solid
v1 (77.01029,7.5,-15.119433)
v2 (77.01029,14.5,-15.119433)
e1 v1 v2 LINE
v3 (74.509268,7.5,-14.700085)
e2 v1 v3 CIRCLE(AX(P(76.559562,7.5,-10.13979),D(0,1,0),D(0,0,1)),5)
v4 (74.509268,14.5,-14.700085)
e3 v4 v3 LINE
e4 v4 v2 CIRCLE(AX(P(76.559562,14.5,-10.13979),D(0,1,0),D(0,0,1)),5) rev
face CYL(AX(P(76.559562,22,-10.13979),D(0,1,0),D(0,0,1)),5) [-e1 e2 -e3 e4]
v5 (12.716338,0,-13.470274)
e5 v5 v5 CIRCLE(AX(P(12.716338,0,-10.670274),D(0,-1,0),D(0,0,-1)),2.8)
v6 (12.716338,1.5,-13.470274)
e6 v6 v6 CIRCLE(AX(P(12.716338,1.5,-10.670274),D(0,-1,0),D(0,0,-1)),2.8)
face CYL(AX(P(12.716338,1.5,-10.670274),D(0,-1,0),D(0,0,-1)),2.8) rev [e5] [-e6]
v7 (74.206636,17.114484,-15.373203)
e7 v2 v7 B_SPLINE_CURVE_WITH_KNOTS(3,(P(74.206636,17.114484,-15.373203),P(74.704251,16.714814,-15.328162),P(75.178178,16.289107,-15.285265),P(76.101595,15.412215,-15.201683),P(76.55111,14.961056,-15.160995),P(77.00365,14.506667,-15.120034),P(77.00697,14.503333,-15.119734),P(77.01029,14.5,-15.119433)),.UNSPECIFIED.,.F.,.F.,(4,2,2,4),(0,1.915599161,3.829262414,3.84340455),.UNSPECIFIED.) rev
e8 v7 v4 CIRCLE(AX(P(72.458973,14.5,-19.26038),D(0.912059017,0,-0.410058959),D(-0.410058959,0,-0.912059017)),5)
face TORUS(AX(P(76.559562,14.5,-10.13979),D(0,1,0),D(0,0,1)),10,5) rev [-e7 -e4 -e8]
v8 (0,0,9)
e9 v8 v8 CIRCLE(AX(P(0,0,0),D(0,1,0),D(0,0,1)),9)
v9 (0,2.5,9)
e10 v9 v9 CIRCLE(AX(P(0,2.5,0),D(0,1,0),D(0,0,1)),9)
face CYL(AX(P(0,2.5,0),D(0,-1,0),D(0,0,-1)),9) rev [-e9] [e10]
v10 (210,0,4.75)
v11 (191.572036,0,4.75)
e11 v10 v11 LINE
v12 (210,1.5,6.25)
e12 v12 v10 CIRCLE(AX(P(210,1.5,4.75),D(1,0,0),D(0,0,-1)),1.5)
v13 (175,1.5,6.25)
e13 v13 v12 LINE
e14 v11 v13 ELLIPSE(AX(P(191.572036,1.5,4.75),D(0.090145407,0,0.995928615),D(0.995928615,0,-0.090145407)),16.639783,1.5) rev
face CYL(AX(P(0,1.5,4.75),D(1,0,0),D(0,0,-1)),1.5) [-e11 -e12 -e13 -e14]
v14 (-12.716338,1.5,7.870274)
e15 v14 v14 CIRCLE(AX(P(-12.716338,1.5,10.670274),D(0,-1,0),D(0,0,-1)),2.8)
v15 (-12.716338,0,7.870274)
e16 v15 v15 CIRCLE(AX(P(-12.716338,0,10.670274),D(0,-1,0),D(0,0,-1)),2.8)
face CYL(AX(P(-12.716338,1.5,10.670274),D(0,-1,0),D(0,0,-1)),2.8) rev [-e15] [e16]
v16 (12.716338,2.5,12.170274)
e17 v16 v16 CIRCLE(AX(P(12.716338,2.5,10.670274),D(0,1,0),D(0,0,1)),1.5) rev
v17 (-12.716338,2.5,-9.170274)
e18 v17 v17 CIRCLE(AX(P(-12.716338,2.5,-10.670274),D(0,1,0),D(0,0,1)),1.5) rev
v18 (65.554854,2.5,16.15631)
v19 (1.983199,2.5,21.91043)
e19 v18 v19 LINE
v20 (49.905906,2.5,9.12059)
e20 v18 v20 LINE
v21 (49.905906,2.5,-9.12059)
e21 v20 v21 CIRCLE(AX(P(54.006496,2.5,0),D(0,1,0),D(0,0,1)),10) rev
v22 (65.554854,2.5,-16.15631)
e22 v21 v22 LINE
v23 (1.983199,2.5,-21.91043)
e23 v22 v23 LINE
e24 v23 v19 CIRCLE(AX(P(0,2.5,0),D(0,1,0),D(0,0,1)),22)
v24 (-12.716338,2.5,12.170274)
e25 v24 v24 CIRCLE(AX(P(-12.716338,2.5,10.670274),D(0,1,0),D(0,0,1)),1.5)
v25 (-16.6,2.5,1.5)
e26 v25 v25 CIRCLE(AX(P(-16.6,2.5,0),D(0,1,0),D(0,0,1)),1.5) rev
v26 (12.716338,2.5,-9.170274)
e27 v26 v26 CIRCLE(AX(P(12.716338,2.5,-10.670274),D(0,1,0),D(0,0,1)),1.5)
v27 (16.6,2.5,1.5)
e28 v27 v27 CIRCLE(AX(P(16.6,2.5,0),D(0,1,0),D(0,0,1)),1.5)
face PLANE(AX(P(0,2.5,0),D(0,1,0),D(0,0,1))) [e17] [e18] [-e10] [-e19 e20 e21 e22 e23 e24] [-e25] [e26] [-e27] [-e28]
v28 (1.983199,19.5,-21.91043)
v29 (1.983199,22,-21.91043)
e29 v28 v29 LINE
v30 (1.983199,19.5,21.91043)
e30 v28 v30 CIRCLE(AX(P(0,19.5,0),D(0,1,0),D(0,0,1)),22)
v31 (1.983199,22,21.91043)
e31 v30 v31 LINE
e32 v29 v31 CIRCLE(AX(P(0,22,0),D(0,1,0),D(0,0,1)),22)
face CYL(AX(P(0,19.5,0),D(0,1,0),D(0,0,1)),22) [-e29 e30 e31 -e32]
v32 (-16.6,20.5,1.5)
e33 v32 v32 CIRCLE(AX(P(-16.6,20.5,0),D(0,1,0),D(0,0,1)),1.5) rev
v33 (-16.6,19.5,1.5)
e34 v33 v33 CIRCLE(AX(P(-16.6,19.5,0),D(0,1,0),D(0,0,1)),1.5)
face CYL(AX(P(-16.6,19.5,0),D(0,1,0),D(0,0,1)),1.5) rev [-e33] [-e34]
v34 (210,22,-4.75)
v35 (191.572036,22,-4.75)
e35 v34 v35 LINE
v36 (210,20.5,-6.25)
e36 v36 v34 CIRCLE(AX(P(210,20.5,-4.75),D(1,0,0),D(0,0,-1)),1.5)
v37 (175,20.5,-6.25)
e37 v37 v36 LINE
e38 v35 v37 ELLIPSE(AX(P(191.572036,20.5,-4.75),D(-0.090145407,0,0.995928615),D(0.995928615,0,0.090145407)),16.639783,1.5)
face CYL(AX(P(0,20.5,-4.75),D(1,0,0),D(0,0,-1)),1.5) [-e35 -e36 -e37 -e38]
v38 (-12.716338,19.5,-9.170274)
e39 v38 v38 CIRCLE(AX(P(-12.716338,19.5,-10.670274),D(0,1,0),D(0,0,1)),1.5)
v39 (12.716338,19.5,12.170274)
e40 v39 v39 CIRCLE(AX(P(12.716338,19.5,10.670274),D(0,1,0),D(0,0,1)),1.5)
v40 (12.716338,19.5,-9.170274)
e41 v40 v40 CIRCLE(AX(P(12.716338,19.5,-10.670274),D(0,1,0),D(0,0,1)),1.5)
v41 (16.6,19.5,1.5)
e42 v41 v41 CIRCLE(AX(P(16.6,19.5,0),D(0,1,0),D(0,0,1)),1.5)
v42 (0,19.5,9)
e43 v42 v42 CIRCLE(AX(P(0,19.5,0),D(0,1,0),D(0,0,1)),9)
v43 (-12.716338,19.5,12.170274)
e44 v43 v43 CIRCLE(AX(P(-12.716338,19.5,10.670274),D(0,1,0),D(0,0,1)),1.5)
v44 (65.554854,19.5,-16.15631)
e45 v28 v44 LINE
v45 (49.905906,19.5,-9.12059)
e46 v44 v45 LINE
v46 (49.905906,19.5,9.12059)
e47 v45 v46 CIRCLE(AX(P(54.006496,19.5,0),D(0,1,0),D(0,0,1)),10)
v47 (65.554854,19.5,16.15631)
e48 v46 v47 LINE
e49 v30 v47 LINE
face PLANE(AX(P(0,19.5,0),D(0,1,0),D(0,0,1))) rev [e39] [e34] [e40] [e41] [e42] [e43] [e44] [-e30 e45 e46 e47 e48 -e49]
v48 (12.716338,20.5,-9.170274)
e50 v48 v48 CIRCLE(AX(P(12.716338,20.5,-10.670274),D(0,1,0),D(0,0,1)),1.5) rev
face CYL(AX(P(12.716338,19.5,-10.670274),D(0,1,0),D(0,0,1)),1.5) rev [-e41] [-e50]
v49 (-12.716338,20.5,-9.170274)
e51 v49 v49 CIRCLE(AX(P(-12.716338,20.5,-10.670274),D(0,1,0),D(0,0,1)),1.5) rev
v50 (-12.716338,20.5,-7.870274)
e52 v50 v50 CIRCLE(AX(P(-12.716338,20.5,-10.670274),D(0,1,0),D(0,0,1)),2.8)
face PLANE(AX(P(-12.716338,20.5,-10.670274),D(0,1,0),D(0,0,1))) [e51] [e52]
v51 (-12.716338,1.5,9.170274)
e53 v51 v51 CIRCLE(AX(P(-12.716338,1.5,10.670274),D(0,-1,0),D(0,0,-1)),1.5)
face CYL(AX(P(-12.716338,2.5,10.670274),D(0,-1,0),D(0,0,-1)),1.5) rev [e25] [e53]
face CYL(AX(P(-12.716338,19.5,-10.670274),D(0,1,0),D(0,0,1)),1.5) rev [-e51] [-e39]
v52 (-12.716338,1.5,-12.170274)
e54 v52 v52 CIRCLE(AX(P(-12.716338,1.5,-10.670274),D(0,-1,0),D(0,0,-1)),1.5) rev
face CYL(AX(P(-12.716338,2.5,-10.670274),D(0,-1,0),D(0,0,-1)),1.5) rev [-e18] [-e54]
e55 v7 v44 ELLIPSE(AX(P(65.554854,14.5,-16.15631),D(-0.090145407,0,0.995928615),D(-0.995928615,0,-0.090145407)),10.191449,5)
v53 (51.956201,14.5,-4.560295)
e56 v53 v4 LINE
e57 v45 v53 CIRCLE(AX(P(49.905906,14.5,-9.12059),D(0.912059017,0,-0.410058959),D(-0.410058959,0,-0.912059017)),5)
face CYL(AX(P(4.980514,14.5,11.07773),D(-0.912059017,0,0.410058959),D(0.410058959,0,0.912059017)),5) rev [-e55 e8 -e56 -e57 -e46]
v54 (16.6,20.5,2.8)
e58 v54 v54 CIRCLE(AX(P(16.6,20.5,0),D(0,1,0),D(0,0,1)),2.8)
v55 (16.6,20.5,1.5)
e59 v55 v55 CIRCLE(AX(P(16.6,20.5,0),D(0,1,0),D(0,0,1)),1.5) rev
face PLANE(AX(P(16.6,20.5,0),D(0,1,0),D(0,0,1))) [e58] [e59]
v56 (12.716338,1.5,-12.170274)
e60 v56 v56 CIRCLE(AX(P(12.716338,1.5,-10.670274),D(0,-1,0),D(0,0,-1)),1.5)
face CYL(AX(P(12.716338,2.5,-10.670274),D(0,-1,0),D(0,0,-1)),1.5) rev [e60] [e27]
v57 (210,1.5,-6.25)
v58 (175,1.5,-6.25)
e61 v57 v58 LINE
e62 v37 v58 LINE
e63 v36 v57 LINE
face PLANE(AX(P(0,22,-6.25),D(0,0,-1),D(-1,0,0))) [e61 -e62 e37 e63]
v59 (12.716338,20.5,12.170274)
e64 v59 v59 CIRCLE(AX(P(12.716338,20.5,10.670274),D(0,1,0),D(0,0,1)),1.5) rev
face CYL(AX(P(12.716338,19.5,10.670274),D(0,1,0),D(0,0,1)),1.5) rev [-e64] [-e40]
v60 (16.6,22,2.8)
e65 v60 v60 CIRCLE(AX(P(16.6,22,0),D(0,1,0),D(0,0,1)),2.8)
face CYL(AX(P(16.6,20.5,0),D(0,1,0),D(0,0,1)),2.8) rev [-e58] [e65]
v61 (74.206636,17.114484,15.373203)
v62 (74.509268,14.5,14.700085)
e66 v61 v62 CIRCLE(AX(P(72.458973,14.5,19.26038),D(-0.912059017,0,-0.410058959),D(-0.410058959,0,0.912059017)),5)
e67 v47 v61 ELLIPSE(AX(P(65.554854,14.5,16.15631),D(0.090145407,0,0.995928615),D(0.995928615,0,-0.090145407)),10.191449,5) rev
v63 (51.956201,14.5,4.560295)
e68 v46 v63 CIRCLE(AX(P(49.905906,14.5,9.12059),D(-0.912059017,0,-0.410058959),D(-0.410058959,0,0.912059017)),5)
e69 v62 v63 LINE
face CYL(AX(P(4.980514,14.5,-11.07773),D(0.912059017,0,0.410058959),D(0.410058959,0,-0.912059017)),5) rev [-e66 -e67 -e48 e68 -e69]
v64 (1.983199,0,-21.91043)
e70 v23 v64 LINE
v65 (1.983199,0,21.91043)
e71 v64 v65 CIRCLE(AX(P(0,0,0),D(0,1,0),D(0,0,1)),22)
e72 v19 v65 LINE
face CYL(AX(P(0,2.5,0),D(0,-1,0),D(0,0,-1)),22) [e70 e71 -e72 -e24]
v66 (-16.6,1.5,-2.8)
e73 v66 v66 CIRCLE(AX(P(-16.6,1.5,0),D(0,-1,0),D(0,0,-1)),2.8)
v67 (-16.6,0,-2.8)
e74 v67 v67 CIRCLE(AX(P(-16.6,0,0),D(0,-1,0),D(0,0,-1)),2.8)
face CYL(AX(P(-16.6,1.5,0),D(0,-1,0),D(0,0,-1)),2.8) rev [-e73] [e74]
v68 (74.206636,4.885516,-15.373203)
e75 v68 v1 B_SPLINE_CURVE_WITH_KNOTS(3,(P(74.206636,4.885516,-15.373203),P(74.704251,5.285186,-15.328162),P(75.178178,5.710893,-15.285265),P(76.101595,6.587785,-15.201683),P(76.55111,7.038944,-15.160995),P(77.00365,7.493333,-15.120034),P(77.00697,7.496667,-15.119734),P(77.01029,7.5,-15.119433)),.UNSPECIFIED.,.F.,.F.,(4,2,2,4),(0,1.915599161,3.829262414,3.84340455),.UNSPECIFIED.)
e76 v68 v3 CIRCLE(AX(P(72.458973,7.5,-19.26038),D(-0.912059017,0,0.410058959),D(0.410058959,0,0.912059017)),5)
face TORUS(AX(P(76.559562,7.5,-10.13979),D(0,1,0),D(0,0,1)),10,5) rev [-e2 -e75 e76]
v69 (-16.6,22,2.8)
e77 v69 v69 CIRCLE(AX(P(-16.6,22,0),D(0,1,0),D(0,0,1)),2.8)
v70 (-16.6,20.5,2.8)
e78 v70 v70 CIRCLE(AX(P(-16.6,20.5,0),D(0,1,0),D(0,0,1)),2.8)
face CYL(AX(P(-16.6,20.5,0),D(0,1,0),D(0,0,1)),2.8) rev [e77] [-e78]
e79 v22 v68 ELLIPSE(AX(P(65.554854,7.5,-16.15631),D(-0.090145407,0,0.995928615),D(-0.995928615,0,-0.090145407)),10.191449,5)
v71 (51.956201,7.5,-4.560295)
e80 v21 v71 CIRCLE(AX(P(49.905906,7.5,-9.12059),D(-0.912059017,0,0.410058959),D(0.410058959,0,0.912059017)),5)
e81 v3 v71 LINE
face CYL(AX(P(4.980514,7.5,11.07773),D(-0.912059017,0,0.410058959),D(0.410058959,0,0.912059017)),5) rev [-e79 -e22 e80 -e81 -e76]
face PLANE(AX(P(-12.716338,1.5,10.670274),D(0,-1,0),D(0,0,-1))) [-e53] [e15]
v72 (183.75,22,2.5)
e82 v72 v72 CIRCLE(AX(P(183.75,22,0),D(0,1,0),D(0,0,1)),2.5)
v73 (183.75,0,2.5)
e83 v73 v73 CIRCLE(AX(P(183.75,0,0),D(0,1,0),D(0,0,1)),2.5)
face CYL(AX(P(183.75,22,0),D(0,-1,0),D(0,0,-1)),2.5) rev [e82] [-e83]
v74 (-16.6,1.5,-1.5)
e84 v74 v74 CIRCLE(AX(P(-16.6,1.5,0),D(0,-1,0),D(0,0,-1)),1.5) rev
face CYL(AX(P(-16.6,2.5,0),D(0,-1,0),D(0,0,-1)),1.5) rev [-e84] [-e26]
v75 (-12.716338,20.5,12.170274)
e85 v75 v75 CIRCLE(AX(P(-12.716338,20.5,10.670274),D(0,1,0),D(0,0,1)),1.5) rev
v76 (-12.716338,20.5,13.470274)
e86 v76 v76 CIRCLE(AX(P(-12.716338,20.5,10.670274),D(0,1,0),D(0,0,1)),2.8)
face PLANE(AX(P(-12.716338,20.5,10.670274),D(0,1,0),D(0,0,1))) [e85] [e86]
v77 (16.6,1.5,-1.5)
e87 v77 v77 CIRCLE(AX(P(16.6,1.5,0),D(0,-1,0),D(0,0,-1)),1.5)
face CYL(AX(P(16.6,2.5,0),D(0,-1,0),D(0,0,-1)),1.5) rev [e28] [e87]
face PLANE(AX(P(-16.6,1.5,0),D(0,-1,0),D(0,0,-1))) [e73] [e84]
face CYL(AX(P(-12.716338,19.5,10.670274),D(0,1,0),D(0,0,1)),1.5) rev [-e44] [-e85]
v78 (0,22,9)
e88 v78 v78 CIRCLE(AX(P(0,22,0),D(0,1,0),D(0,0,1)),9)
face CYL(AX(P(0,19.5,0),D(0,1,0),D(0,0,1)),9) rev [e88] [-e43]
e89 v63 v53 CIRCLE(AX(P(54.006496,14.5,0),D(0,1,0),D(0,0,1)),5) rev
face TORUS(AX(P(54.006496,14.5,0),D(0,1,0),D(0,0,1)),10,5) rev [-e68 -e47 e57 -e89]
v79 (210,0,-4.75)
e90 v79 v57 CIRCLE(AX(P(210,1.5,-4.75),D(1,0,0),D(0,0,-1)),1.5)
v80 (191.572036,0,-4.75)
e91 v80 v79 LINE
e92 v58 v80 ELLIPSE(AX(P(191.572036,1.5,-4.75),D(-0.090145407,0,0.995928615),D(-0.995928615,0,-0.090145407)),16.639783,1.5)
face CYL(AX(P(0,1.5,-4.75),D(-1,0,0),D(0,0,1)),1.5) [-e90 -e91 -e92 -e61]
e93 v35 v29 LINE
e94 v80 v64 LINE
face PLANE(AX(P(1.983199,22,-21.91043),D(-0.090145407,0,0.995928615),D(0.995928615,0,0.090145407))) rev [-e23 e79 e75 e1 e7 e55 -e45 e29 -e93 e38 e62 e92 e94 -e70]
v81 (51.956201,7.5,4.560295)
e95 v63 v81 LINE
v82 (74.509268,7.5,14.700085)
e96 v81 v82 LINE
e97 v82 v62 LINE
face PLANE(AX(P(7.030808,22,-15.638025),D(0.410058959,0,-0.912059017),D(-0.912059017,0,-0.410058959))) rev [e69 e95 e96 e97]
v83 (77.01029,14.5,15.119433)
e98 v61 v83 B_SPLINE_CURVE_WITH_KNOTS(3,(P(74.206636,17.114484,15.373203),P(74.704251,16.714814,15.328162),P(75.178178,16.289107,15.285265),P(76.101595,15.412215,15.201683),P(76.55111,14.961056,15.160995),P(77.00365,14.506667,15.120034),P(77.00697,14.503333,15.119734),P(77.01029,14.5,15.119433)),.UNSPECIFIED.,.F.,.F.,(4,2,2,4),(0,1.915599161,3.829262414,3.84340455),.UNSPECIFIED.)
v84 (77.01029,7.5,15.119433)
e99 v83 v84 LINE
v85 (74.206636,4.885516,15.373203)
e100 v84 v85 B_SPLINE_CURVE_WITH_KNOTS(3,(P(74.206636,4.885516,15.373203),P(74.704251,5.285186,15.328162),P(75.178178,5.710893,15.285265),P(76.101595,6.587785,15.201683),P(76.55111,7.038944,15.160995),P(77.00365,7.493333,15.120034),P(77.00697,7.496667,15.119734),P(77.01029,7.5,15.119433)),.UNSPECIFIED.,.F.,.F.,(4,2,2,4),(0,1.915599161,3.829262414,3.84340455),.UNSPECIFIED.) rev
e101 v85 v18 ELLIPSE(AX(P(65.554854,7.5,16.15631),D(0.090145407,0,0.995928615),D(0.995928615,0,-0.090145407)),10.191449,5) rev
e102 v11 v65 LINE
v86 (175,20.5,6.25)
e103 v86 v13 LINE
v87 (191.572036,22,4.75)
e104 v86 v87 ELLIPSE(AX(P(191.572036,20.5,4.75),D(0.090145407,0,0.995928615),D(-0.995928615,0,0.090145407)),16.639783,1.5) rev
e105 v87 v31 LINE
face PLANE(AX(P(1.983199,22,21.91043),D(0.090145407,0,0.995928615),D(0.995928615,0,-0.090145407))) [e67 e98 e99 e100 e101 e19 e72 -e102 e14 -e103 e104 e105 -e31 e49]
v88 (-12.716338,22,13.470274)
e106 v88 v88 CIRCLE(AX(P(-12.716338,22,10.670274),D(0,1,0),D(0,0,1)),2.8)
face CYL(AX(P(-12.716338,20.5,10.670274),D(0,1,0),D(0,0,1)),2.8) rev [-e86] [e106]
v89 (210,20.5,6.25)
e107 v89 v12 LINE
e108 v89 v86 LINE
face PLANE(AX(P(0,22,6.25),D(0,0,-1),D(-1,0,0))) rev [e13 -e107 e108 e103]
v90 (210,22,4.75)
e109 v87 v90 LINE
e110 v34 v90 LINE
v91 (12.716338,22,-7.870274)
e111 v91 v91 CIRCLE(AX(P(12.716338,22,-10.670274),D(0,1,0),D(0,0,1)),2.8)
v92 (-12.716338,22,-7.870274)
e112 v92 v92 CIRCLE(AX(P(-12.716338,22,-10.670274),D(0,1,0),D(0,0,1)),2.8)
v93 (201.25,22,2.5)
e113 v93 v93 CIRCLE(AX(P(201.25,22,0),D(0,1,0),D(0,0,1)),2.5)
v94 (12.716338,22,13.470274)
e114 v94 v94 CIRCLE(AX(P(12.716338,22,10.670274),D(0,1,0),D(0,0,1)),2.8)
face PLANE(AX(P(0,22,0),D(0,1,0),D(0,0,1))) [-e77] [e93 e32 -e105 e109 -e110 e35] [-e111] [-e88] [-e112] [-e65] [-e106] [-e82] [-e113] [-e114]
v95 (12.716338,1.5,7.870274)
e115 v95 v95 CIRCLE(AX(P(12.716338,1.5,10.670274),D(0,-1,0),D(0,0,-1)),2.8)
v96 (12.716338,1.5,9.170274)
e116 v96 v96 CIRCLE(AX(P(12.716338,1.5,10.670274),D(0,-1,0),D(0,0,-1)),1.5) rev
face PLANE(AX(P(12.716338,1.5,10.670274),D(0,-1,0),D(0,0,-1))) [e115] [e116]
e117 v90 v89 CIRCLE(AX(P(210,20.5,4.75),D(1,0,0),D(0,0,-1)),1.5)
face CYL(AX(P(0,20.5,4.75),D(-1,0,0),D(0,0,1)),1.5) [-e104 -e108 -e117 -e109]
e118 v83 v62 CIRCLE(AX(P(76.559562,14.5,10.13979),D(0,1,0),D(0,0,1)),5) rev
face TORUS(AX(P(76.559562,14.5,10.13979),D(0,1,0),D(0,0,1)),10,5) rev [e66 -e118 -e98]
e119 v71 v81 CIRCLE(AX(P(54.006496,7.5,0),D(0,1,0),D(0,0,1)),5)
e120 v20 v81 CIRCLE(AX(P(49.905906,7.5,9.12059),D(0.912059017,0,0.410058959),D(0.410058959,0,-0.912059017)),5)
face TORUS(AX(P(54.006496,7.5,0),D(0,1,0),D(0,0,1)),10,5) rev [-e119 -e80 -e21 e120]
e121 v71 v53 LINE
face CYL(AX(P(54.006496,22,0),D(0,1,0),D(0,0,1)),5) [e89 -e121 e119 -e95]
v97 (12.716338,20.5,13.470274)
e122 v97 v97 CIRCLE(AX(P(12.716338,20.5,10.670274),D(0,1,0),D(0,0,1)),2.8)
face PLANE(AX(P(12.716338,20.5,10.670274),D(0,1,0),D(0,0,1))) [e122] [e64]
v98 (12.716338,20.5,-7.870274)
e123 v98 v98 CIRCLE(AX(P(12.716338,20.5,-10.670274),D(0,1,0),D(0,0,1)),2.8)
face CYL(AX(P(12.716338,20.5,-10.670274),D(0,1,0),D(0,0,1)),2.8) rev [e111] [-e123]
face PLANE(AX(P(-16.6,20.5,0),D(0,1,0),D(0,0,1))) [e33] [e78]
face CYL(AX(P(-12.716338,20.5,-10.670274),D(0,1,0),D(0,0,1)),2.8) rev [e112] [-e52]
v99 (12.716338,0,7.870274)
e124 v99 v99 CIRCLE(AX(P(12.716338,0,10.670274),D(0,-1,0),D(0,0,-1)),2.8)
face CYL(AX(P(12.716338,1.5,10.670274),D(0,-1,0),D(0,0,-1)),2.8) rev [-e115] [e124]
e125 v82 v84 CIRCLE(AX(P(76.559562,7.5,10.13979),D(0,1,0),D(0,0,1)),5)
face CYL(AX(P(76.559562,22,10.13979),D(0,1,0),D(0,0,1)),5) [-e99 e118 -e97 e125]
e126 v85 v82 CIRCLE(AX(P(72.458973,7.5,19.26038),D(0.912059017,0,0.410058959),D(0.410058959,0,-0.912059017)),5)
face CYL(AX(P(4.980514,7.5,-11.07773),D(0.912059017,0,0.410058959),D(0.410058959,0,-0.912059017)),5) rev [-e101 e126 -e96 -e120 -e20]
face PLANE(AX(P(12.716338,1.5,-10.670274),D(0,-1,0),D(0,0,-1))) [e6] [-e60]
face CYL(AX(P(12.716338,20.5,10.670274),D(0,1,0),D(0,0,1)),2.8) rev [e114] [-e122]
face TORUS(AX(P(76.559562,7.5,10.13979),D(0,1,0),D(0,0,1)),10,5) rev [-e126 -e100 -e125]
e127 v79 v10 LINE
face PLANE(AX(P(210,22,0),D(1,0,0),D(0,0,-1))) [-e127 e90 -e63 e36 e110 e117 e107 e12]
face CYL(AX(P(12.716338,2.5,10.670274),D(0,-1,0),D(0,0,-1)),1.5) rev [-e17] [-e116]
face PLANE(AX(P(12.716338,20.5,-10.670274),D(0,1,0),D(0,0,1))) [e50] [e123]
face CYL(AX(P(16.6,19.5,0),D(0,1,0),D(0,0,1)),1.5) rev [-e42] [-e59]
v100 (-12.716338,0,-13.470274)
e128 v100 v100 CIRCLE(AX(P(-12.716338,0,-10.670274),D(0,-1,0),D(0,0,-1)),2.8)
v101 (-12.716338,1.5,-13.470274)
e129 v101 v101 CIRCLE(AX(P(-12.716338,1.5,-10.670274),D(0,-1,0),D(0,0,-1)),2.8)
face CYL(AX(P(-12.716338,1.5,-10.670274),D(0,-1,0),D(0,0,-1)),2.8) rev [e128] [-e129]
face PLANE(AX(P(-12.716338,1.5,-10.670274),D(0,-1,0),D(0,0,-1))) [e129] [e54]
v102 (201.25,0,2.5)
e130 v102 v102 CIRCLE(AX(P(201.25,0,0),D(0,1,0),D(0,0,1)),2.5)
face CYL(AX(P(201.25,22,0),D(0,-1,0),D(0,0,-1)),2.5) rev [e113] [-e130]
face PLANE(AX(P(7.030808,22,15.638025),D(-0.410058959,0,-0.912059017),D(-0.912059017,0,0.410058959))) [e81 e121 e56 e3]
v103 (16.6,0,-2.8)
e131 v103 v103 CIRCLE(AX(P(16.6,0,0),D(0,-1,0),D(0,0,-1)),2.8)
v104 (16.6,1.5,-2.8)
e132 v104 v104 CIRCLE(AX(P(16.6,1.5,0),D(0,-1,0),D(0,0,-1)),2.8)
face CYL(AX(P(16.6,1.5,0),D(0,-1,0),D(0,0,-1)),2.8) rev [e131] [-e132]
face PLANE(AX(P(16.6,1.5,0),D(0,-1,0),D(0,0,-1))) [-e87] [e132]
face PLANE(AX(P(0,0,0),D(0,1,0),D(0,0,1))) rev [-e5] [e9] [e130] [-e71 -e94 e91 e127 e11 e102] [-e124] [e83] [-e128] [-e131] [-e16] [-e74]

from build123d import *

# Parameters (mm, degrees)
SKETCH1_R           = 2.499999999999995
SKETCH1_R_2         = 2.4999999999999956
BOSS_EXTRUDE1_DEPTH = 22
SKETCH1_3_R         = 22
SKETCH1_3_R_2       = 1.499999999999997
SKETCH1_3_R_3       = 1.4999999999999987
SKETCH1_3_R_4       = 9
BOSS_EXTRUDE2_DEPTH = 2.5
BOSS_EXTRUDE3_START = 19.5
SKETCH1_4_R         = 22
SKETCH1_4_R_2       = 1.499999999999997
SKETCH1_4_R_3       = 1.4999999999999987
SKETCH1_4_R_4       = 9
BOSS_EXTRUDE3_DEPTH = 2.5
FILLET1_R           = 5
FILLET2_R           = 5
SKETCH2_R           = 2.8000000000000003
SKETCH2_R_2         = 2.799999999999998
SKETCH2_R_3         = 2.800000000000374
SKETCH2_R_4         = 2.800000000000002
SKETCH2_R_5         = 2.8000000000000007
CUT_EXTRUDE3_DEPTH  = 1.5
CUT_EXTRUDE4_START  = -20.5
SKETCH2_3_R         = 2.8000000000000003
SKETCH2_3_R_2       = 2.799999999999998
SKETCH2_3_R_3       = 2.800000000000374
SKETCH2_3_R_4       = 2.800000000000002
SKETCH2_3_R_5       = 2.8000000000000007
CUT_EXTRUDE4_DEPTH  = 1.5
FILLET3_R           = 1.5


with BuildPart() as part:
    # Sketch1 → Boss-Extrude1 (new body)
    with BuildSketch(Plane(origin=(0, 0, 0), x_dir=(1, 0, 0), z_dir=(0, 1, 0))):
        Polygon((210, 6.25), (175, 6.25), (75.7048097561628, 15.237597270585965), (41.813127412360984, 0), (75.70480975616282, -15.237597270585962), (175, -6.25), (210, -6.25), align=None)
        with Locations(Location((183.75, 8.7e-16, 0), (0, 0, 270))):
            Circle(SKETCH1_R, mode=Mode.SUBTRACT)
        with Locations(Location((201.24999999999997, 8.7e-16, 0), (0, 0, 270))):
            Circle(SKETCH1_R_2, mode=Mode.SUBTRACT)
    extrude(amount=BOSS_EXTRUDE1_DEPTH)

    # Sketch1<3> → Boss-Extrude2 (add)
    # profile 1 of 3: a face of its own
    with BuildSketch(Plane(origin=(0, 0, 0), x_dir=(1, 0, 0), z_dir=(0, 1, 0))):
        Circle(SKETCH1_3_R)
        with Locations(Location((-16.599999999999994, -4.07e-15, 0), (0, 0, 270))):
            Circle(SKETCH1_3_R_2, mode=Mode.SUBTRACT)
        with Locations(Location((-12.716337755775092, -10.670274320796484, 0), (0, 0, 270))):
            Circle(SKETCH1_3_R_3, mode=Mode.SUBTRACT)
        with Locations(Location((12.716337755775099, -10.67027432079648, 0), (0, 0, 270))):
            Circle(SKETCH1_3_R_3, mode=Mode.SUBTRACT)
        with Locations(Location((12.716337755775099, 10.67027432079648, 0), (0, 0, 270))):
            Circle(SKETCH1_3_R_3, mode=Mode.SUBTRACT)
        with Locations(Location((16.6, 0, 0), (0, 0, 270))):
            Circle(SKETCH1_3_R_2, mode=Mode.SUBTRACT)
        with Locations(Location((-12.716337755775095, 10.670274320796477, 0), (0, 0, 270))):
            Circle(SKETCH1_3_R_3, mode=Mode.SUBTRACT)
        with Locations(Location((0, 0, 0), (0, 0, 270))):
            Circle(SKETCH1_3_R_4, mode=Mode.SUBTRACT)
    # profile 2 of 3: a face of its own
    with BuildSketch(Plane(origin=(0, 0, 0), x_dir=(1, 0, 0), z_dir=(0, 1, 0))):
        with BuildLine():
            ThreePointArc((26, 0), (23.30625405943406, 11.524691827424864), (15.783190637145122, 20.661338129742095))
            Line((15.783190637145111, 20.661338129742038), (1.9831989455582573, 21.910429524368908))
            ThreePointArc((1.9831989455582602, 21.910429524368904), (16.242388629790288, 14.838625664085578), (22, 0))
            ThreePointArc((22, -5.39e-15), (16.24238862979029, -14.838625664085573), (1.9831989455582546, -21.910429524368904))
            Line((1.9831989455582573, -21.910429524368908), (15.783190637145054, -20.66133812974204))
            ThreePointArc((15.78319063714509, -20.66133812974212), (23.30625405943405, -11.524691827424883), (26, -6.37e-15))
        make_face()
    # profile 3 of 3: a face of its own
    with BuildSketch(Plane(origin=(0, 0, 0), x_dir=(1, 0, 0), z_dir=(0, 1, 0))):
        with BuildLine():
            Line((41.813127412360984, 0), (75.7048097561628, 15.237597270585965))
            Line((75.7048097561628, 15.237597270585965), (15.783190637145111, 20.661338129742038))
            ThreePointArc((15.783190637145122, 20.661338129742095), (23.30625405943406, 11.524691827424864), (26, 0))
            ThreePointArc((26, -6.37e-15), (23.30625405943405, -11.524691827424883), (15.78319063714509, -20.66133812974212))
            Line((15.783190637145054, -20.66133812974204), (75.70480975616282, -15.237597270585963))
            Line((75.70480975616282, -15.237597270585962), (41.813127412360984, 0))
        make_face()
    extrude(amount=BOSS_EXTRUDE2_DEPTH)

    # Sketch1<4> → Boss-Extrude3 (add)
    # profile 1 of 3: a face of its own
    with BuildSketch(Plane(origin=(0, 0, 0), x_dir=(1, 0, 0), z_dir=(0, 1, 0)).offset(BOSS_EXTRUDE3_START)):
        Circle(SKETCH1_4_R)
        with Locations(Location((-16.599999999999994, -4.07e-15, 0), (0, 0, 270))):
            Circle(SKETCH1_4_R_2, mode=Mode.SUBTRACT)
        with Locations(Location((-12.716337755775092, -10.670274320796484, 0), (0, 0, 270))):
            Circle(SKETCH1_4_R_3, mode=Mode.SUBTRACT)
        with Locations(Location((12.716337755775099, -10.67027432079648, 0), (0, 0, 270))):
            Circle(SKETCH1_4_R_3, mode=Mode.SUBTRACT)
        with Locations(Location((12.716337755775099, 10.67027432079648, 0), (0, 0, 270))):
            Circle(SKETCH1_4_R_3, mode=Mode.SUBTRACT)
        with Locations(Location((16.6, 0, 0), (0, 0, 270))):
            Circle(SKETCH1_4_R_2, mode=Mode.SUBTRACT)
        with Locations(Location((-12.716337755775095, 10.670274320796477, 0), (0, 0, 270))):
            Circle(SKETCH1_4_R_3, mode=Mode.SUBTRACT)
        with Locations(Location((0, 0, 0), (0, 0, 270))):
            Circle(SKETCH1_4_R_4, mode=Mode.SUBTRACT)
    # profile 2 of 3: a face of its own
    with BuildSketch(Plane(origin=(0, 0, 0), x_dir=(1, 0, 0), z_dir=(0, 1, 0)).offset(BOSS_EXTRUDE3_START)):
        with BuildLine():
            ThreePointArc((26, 0), (23.30625405943406, 11.524691827424864), (15.783190637145122, 20.661338129742095))
            Line((15.783190637145111, 20.661338129742038), (1.9831989455582573, 21.910429524368908))
            ThreePointArc((1.9831989455582602, 21.910429524368904), (16.242388629790288, 14.838625664085578), (22, 0))
            ThreePointArc((22, -5.39e-15), (16.24238862979029, -14.838625664085573), (1.9831989455582546, -21.910429524368904))
            Line((1.9831989455582573, -21.910429524368908), (15.783190637145054, -20.66133812974204))
            ThreePointArc((15.78319063714509, -20.66133812974212), (23.30625405943405, -11.524691827424883), (26, -6.37e-15))
        make_face()
    # profile 3 of 3: a face of its own
    with BuildSketch(Plane(origin=(0, 0, 0), x_dir=(1, 0, 0), z_dir=(0, 1, 0)).offset(BOSS_EXTRUDE3_START)):
        with BuildLine():
            Line((41.813127412360984, 0), (75.7048097561628, 15.237597270585965))
            Line((75.7048097561628, 15.237597270585965), (15.783190637145111, 20.661338129742038))
            ThreePointArc((15.783190637145122, 20.661338129742095), (23.30625405943406, 11.524691827424864), (26, 0))
            ThreePointArc((26, -6.37e-15), (23.30625405943405, -11.524691827424883), (15.78319063714509, -20.66133812974212))
            Line((15.783190637145054, -20.66133812974204), (75.70480975616282, -15.237597270585963))
            Line((75.70480975616282, -15.237597270585962), (41.813127412360984, 0))
        make_face()
    extrude(amount=BOSS_EXTRUDE3_DEPTH)

    # Fillet1
    fillet1_edges = [part.edges().sort_by_distance(p)[0] for p in [
        (75.7048097561628, 11, -15.237597270585965),
        (75.70480975616282, 11, 15.237597270585962),
        (41.813127412360984, 11, 0),
    ]]
    fillet(fillet1_edges, radius=FILLET1_R)

    # Fillet2
    # the kernel refuses this fillet: 5 mm, written as the material it adds along each edge
    with BuildSketch(Plane(origin=(74.50926767179394, 19.5, 14.700085186740369), x_dir=(-0.4100589591103126, 0, 0.9120590167600816), z_dir=(-0.9120590167600817, 0, -0.41005895911031254))) as fillet2_piece_1_section:
        with BuildLine():
            CenterArc((FILLET2_R, -FILLET2_R), FILLET2_R, 90, 90)
            Line((-1.62e-15, -FILLET2_R), (0, 0))
            Line((0, 0), (FILLET2_R, 0))
        make_face()
    fillet2_piece_1 = extrude(amount=24.72763947150388, mode=Mode.PRIVATE)
    fillet2_piece_1 = split(fillet2_piece_1, bisect_by=Plane(origin=(62.92164276949458, 18.35420314681747, 16.394651871485475), z_dir=(-0.09014540661628426, 0, -0.9959286147440413)), keep=Keep.TOP, mode=Mode.PRIVATE)
    add(fillet2_piece_1)
    with BuildSketch(Plane(origin=(74.50926767179394, 2.5, 14.700085186740369), x_dir=(-0.4100589591103126, 0, 0.9120590167600816), z_dir=(-0.9120590167600817, 0, -0.41005895911031254))) as fillet2_piece_2_section:
        with BuildLine():
            CenterArc((FILLET2_R, FILLET2_R), FILLET2_R, 180, 90)
            Line((-1.62e-15, FILLET2_R), (0, 0))
            Line((0, 0), (FILLET2_R, 0))
        make_face()
    fillet2_piece_2 = extrude(amount=24.72763947150388, mode=Mode.PRIVATE)
    fillet2_piece_2 = split(fillet2_piece_2, bisect_by=Plane(origin=(62.921642769494596, 3.6457968531825293, 16.394651871485472), z_dir=(-0.09014540661628426, 0, -0.9959286147440413)), keep=Keep.TOP, mode=Mode.PRIVATE)
    add(fillet2_piece_2)
    with BuildSketch(Plane(origin=(51.95620112861632, 19.5, -4.560295083800408), x_dir=(-0.41005895911031287, 0, -0.9120590167600817), z_dir=(0.9120590167600817, 0, -0.4100589591103128))) as fillet2_piece_3_section:
        with BuildLine():
            CenterArc((FILLET2_R, -FILLET2_R), FILLET2_R, 90, 90)
            Line((3.3e-16, -FILLET2_R), (0, 0))
            Line((0, 0), (FILLET2_R, 0))
        make_face()
    fillet2_piece_3 = extrude(amount=24.727639471503775, mode=Mode.PRIVATE)
    fillet2_piece_3 = split(fillet2_piece_3, bisect_by=Plane(origin=(62.921642769494525, 18.354203146817465, -16.39465187148548), z_dir=(-0.09014540661628426, 0, 0.9959286147440413)), keep=Keep.TOP, mode=Mode.PRIVATE)
    add(fillet2_piece_3)
    with BuildSketch(Plane(origin=(51.95620112861632, 2.5, -4.560295083800408), x_dir=(-0.41005895911031287, 0, -0.9120590167600817), z_dir=(0.9120590167600817, 0, -0.4100589591103128))) as fillet2_piece_4_section:
        with BuildLine():
            CenterArc((FILLET2_R, FILLET2_R), FILLET2_R, 180, 90)
            Line((3.3e-16, FILLET2_R), (0, 0))
            Line((0, 0), (FILLET2_R, 0))
        make_face()
    fillet2_piece_4 = extrude(amount=24.727639471503775, mode=Mode.PRIVATE)
    fillet2_piece_4 = split(fillet2_piece_4, bisect_by=Plane(origin=(62.921642769494554, 3.6457968531825298, -16.39465187148548), z_dir=(-0.09014540661628426, 0, 0.9959286147440413)), keep=Keep.TOP, mode=Mode.PRIVATE)
    add(fillet2_piece_4)
    with BuildSketch(Plane(origin=(76.5595624673455, 2.5, 10.139790102939958), x_dir=(-0.4100589591103129, 0, 0.9120590167600815), z_dir=(-0.9120590167600815, 0, -0.4100589591103129))) as fillet2_piece_5_section:
        with BuildLine():
            CenterArc((5.000000000000001 + FILLET2_R, FILLET2_R), FILLET2_R, 180, 90)
            Line((4.999999999999998, FILLET2_R), (5.000000000000001, 0))
            Line((5.000000000000001, 0), (5.000000000000001 + FILLET2_R, 0))
        make_face()
    fillet2_piece_5 = revolve(axis=Axis((76.5595624673455, 2.5, 10.139790102939958), (0, 1, 0)), revolution_arc=172.6260901636111, mode=Mode.PRIVATE)
    fillet2_piece_5 = split(fillet2_piece_5, bisect_by=Plane(origin=(74.84793823871587, 4.260840075663418, 15.315156073711647), z_dir=(-0.09014540661628426, 0, -0.9959286147440413)), keep=Keep.TOP, mode=Mode.PRIVATE)
    add(fillet2_piece_5)
    with BuildSketch(Plane(origin=(76.5595624673455, 19.5, 10.139790102939958), x_dir=(-0.4100589591103129, 0, 0.9120590167600815), z_dir=(-0.9120590167600815, 0, -0.4100589591103129))) as fillet2_piece_6_section:
        with BuildLine():
            CenterArc((5.000000000000001 + FILLET2_R, -FILLET2_R), FILLET2_R, 90, 90)
            Line((4.999999999999998, -FILLET2_R), (5.000000000000001, 0))
            Line((5.000000000000001, 0), (5.000000000000001 + FILLET2_R, 0))
        make_face()
    fillet2_piece_6 = revolve(axis=Axis((76.5595624673455, 19.5, 10.139790102939958), (0, 1, 0)), revolution_arc=172.6260901636111, mode=Mode.PRIVATE)
    fillet2_piece_6 = split(fillet2_piece_6, bisect_by=Plane(origin=(74.84793823871586, 17.739159924336587, 15.315156073711648), z_dir=(-0.09014540661628426, 0, -0.9959286147440413)), keep=Keep.TOP, mode=Mode.PRIVATE)
    add(fillet2_piece_6)
    with BuildSketch(Plane(origin=(76.55956246734539, 2.5, -10.139790102939964), x_dir=(-0.4100589591103157, 0, -0.9120590167600803), z_dir=(-0.9120590167600803, 0, 0.4100589591103157))) as fillet2_piece_7_section:
        with BuildLine():
            CenterArc((5.000000000000002 + FILLET2_R, -FILLET2_R), FILLET2_R, 90, 90)
            Line((5.000000000000002, -FILLET2_R), (5.000000000000002, 0))
            Line((5.000000000000002, 0), (5.000000000000002 + FILLET2_R, 0))
        make_face()
    fillet2_piece_7 = revolve(axis=Axis((76.55956246734539, 2.5, -10.139790102939964), (0, -1, 0)), revolution_arc=172.6260901636108, mode=Mode.PRIVATE)
    fillet2_piece_7 = split(fillet2_piece_7, bisect_by=Plane(origin=(74.84793824620773, 4.260840162303623, -15.31515607303353), z_dir=(-0.09014540661628426, 0, 0.9959286147440413)), keep=Keep.TOP, mode=Mode.PRIVATE)
    add(fillet2_piece_7)
    with BuildSketch(Plane(origin=(76.55956246734539, 19.5, -10.139790102939964), x_dir=(-0.4100589591103157, 0, -0.9120590167600803), z_dir=(-0.9120590167600803, 0, 0.4100589591103157))) as fillet2_piece_8_section:
        with BuildLine():
            CenterArc((5.000000000000002 + FILLET2_R, FILLET2_R), FILLET2_R, 180, 90)
            Line((5.000000000000002, FILLET2_R), (5.000000000000002, 0))
            Line((5.000000000000002, 0), (5.000000000000002 + FILLET2_R, 0))
        make_face()
    fillet2_piece_8 = revolve(axis=Axis((76.55956246734539, 19.5, -10.139790102939964), (0, -1, 0)), revolution_arc=172.62609016361083, mode=Mode.PRIVATE)
    fillet2_piece_8 = split(fillet2_piece_8, bisect_by=Plane(origin=(74.84793824632831, 17.739159836294988, -15.315156073022614), z_dir=(-0.09014540661628426, 0, 0.9959286147440413)), keep=Keep.TOP, mode=Mode.PRIVATE)
    add(fillet2_piece_8)
    with BuildSketch(Plane(origin=(54.006495924167886, 2.5, 2.88e-15), x_dir=(-0.4100589591103129, 0, -0.9120590167600815), z_dir=(0.9120590167600815, 0, -0.4100589591103129))) as fillet2_piece_9:
        with BuildLine():
            CenterArc((5.000000000000001 + FILLET2_R, FILLET2_R), FILLET2_R, 180, 90)
            Line((5.000000000000001, FILLET2_R), (5.000000000000001, 0))
            Line((5.000000000000001, 0), (5.000000000000001 + FILLET2_R, 0))
        make_face()
    revolve(axis=Axis((54.006495924167886, 2.5, 2.88e-15), (0, 1, 0)), revolution_arc=131.58292285209714)
    with BuildSketch(Plane(origin=(54.006495924167886, 19.5, 2.88e-15), x_dir=(-0.4100589591103129, 0, -0.9120590167600815), z_dir=(0.9120590167600815, 0, -0.4100589591103129))) as fillet2_piece_10:
        with BuildLine():
            CenterArc((5.000000000000001 + FILLET2_R, -FILLET2_R), FILLET2_R, 90, 90)
            Line((5.000000000000001, -FILLET2_R), (5.000000000000001, 0))
            Line((5.000000000000001, 0), (5.000000000000001 + FILLET2_R, 0))
        make_face()
    revolve(axis=Axis((54.006495924167886, 19.5, 2.88e-15), (0, 1, 0)), revolution_arc=131.58292285209714)

    # Sketch2 → Cut-Extrude3 (cut)
    with BuildSketch(Plane.XZ):
        with Locations(Location((12.716337755775099, 10.67027432079648, 0), (0, 0, 270))):
            Circle(SKETCH2_R)
        with Locations(Location((16.600000000000005, -1.1796e-13, 0), (0, 0, 270))):
            Circle(SKETCH2_R_2)
        with Locations(Location((12.71633775577447, -10.670274320796484, 0), (0, 0, 270))):
            Circle(SKETCH2_R_3)
        with Locations(Location((-12.716337755775092, 10.670274320796484, 0), (0, 0, 270))):
            Circle(SKETCH2_R)
        with Locations(Location((-16.600000000000005, -1.1623e-13, 0), (0, 0, 270))):
            Circle(SKETCH2_R_4)
        with Locations(Location((-12.716337755774944, -10.670274320796656, 0), (0, 0, 270))):
            Circle(SKETCH2_R_5)
    extrude(amount=-CUT_EXTRUDE3_DEPTH, mode=Mode.SUBTRACT)

    # Sketch2<3> → Cut-Extrude4 (cut)
    with BuildSketch(Plane.XZ.offset(CUT_EXTRUDE4_START)):
        with Locations(Location((12.716337755775099, 10.67027432079648, 0), (0, 0, 270))):
            Circle(SKETCH2_3_R)
        with Locations(Location((16.600000000000005, -1.1796e-13, 0), (0, 0, 270))):
            Circle(SKETCH2_3_R_2)
        with Locations(Location((12.71633775577447, -10.670274320796484, 0), (0, 0, 270))):
            Circle(SKETCH2_3_R_3)
        with Locations(Location((-12.716337755775092, 10.670274320796484, 0), (0, 0, 270))):
            Circle(SKETCH2_3_R)
        with Locations(Location((-16.600000000000005, -1.1623e-13, 0), (0, 0, 270))):
            Circle(SKETCH2_3_R_4)
        with Locations(Location((-12.716337755774944, -10.670274320796656, 0), (0, 0, 270))):
            Circle(SKETCH2_3_R_5)
    extrude(amount=-CUT_EXTRUDE4_DEPTH, mode=Mode.SUBTRACT)

    # Fillet3
    # the kernel refuses this fillet: 1.5 mm, written as the material it takes off along each edge
    with BuildSketch(Plane(origin=(213.75, 0, -6.25), x_dir=(0, 0, 1), z_dir=(-1, 0, 0))) as fillet3_piece_1_section:
        with BuildLine():
            CenterArc((FILLET3_R, FILLET3_R), FILLET3_R, 180, 90)
            Line((0, FILLET3_R), (0, 0))
            Line((0, 0), (FILLET3_R, 0))
        make_face()
    fillet3_piece_1 = extrude(amount=42.5, mode=Mode.PRIVATE)
    fillet3_piece_1 = split(fillet3_piece_1, bisect_by=Plane(origin=(195.92487896194191, 0.3590942723847128, -4.356007102857218), z_dir=(0.09014540661600601, 0, -0.9959286147440665)), keep=Keep.TOP, mode=Mode.PRIVATE)
    add(fillet3_piece_1, mode=Mode.SUBTRACT)
    with BuildSketch(Plane(origin=(171.25, 0, 6.25), x_dir=(0, 1, 0), z_dir=(1, 0, 0))) as fillet3_piece_2_section:
        with BuildLine():
            CenterArc((FILLET3_R, -FILLET3_R), FILLET3_R, 90, 90)
            Line((-2.2e-16, -FILLET3_R), (0, 0))
            Line((0, 0), (FILLET3_R, 0))
        make_face()
    fillet3_piece_2 = extrude(amount=42.5, mode=Mode.PRIVATE)
    fillet3_piece_2 = split(fillet3_piece_2, bisect_by=Plane(origin=(195.92487896194592, 0.35909427238465597, 4.356007102856864), z_dir=(0.09014540661600601, 0, 0.9959286147440665)), keep=Keep.TOP, mode=Mode.PRIVATE)
    add(fillet3_piece_2, mode=Mode.SUBTRACT)
    with BuildSketch(Plane(origin=(171.25, 22, 6.25), x_dir=(0, 0, -1), z_dir=(1, 0, 0))) as fillet3_piece_3_section:
        with BuildLine():
            CenterArc((FILLET3_R, -FILLET3_R), FILLET3_R, 90, 90)
            Line((0, -FILLET3_R), (0, 0))
            Line((0, 0), (FILLET3_R, 0))
        make_face()
    fillet3_piece_3 = extrude(amount=42.5, mode=Mode.PRIVATE)
    fillet3_piece_3 = split(fillet3_piece_3, bisect_by=Plane(origin=(195.9248789619462, 21.64090572761535, 4.3560071028568395), z_dir=(0.09014540661600601, 0, 0.9959286147440665)), keep=Keep.TOP, mode=Mode.PRIVATE)
    add(fillet3_piece_3, mode=Mode.SUBTRACT)
    with BuildSketch(Plane(origin=(213.75, 22, -6.25), x_dir=(0, 0, 1), z_dir=(-1, 0, 0))) as fillet3_piece_4_section:
        with BuildLine():
            CenterArc((FILLET3_R, -FILLET3_R), FILLET3_R, 90, 90)
            Line((0, -FILLET3_R), (0, 0))
            Line((0, 0), (FILLET3_R, 0))
        make_face()
    fillet3_piece_4 = extrude(amount=42.5, mode=Mode.PRIVATE)
    fillet3_piece_4 = split(fillet3_piece_4, bisect_by=Plane(origin=(195.92487896194174, 21.640905727615277, -4.356007102857232), z_dir=(0.09014540661600601, 0, -0.9959286147440665)), keep=Keep.TOP, mode=Mode.PRIVATE)
    add(fillet3_piece_4, mode=Mode.SUBTRACT)


solid = part.part
